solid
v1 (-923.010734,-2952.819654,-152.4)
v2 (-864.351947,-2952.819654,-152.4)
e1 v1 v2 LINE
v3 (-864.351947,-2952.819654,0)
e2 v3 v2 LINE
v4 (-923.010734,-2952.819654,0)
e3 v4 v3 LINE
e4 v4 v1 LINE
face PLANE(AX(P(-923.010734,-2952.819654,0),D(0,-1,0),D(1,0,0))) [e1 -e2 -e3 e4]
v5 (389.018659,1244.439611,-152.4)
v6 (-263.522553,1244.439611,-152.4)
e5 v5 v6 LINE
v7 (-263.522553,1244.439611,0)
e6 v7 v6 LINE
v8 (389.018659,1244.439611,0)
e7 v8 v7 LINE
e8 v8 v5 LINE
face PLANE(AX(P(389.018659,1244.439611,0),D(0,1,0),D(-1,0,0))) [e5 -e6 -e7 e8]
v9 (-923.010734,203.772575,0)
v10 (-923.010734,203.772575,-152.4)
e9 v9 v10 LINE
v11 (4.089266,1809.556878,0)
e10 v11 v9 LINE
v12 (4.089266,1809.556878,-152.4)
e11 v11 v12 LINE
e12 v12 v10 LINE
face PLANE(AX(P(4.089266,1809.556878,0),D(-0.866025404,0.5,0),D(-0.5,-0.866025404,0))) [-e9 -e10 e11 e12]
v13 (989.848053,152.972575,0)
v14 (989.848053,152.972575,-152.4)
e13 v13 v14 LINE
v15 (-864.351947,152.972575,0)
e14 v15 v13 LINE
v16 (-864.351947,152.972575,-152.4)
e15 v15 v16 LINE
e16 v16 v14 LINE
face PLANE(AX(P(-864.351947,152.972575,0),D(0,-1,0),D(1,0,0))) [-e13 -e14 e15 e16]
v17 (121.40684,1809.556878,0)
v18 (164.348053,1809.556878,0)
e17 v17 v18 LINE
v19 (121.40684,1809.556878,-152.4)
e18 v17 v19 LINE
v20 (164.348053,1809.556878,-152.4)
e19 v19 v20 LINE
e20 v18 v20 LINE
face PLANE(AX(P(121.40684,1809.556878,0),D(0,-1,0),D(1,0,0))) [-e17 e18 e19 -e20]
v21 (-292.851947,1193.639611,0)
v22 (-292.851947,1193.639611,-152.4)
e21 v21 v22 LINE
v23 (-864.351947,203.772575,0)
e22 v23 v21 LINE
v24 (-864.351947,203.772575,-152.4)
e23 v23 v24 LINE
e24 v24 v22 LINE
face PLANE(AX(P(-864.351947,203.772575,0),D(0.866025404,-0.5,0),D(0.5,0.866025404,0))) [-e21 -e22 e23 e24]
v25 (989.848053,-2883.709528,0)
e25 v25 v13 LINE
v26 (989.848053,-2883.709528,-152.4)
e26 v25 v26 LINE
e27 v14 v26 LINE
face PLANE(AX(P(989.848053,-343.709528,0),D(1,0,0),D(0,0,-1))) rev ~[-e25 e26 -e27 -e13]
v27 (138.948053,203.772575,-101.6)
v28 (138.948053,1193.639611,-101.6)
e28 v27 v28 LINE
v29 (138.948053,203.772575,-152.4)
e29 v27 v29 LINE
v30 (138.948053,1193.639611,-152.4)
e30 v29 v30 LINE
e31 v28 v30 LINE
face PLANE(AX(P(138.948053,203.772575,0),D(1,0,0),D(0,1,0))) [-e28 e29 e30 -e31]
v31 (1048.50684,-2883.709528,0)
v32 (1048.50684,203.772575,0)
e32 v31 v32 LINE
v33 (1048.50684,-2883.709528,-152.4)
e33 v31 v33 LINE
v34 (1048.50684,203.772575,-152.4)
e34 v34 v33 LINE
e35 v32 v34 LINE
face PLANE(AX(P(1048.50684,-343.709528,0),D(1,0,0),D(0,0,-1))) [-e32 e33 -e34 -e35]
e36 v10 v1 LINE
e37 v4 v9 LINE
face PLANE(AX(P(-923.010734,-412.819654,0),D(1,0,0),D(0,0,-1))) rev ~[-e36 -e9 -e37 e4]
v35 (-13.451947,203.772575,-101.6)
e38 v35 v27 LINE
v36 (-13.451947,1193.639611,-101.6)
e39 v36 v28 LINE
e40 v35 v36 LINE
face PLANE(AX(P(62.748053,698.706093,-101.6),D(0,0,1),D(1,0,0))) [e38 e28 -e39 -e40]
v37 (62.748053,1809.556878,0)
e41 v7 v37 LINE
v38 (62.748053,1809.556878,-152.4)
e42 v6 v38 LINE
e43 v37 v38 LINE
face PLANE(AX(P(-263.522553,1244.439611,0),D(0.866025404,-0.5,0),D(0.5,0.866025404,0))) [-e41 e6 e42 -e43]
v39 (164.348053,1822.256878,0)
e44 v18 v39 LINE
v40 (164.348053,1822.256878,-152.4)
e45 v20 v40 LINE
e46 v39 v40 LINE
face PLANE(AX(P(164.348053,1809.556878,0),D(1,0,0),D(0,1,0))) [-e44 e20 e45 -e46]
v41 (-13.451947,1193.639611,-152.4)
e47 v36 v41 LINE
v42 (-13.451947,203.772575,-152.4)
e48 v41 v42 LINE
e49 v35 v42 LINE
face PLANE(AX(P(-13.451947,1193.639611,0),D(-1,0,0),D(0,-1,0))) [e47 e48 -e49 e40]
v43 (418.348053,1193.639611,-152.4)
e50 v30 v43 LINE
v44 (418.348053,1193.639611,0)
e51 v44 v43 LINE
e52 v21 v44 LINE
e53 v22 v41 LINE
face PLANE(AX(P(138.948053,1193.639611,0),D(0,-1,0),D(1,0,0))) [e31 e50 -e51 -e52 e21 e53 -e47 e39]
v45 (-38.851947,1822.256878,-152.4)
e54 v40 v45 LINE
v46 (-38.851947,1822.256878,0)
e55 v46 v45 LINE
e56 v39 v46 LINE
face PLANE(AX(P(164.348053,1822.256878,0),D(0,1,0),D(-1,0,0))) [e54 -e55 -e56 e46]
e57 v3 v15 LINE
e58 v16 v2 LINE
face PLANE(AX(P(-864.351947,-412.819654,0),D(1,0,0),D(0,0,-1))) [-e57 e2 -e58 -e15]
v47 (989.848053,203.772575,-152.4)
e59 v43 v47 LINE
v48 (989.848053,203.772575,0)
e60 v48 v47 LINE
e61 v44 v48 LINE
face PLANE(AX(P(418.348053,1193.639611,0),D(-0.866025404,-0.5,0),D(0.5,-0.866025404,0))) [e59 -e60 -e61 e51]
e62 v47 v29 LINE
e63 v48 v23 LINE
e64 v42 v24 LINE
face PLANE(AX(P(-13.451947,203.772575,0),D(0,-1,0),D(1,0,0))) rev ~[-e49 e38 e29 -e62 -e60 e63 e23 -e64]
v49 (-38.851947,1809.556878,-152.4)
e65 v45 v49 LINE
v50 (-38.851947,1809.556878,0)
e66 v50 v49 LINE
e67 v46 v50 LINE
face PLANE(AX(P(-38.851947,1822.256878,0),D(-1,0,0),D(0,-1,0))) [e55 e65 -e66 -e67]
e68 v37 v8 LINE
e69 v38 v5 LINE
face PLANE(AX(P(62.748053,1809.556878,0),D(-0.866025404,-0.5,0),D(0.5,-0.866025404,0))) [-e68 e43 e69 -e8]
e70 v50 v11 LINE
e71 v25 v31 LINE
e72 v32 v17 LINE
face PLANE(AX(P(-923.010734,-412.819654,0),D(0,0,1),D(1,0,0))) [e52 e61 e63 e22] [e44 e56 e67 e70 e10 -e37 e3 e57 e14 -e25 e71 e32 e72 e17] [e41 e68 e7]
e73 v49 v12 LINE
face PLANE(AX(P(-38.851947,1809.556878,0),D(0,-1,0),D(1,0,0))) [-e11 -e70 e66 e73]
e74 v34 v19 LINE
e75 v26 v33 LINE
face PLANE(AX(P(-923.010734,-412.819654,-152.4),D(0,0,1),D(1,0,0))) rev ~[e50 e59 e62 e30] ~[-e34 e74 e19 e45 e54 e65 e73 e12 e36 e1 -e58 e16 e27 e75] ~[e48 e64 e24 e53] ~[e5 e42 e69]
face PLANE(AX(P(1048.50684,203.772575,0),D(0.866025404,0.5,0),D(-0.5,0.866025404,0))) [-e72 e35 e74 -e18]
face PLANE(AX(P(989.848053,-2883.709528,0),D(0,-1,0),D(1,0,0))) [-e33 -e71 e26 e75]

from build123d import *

# Parameters (mm, degrees)
F0_R     = 53.975
F1_DEPTH = 152.4
F2_W     = 152.4
F2_H     = 989.8670365256
F3_DEPTH = 101.6
F6_DEPTH = 2540
F7_DEPTH = 2540


# Not quite as in the source:
# - the program builds the solid bodies; features that only make, move or delete a surface that nothing else refers to are left out


with BuildPart() as f1:
    # F0 (on Top) → F1 (new body)
    with BuildSketch(Plane.XY):
        Polygon((-864.3519468606, 152.9725746632), (-864.3519468606, 203.7725746632), (-923.0107342102, 203.7725746632), (-923.0107342102, -412.8196537495), (-864.3519468606, -412.8196537495), align=None)
        Polygon((989.8480531394, 203.7725746632), (989.8480531394, 152.9725746632), (989.8480531394, -343.7095284462), (1048.5068404891, -343.7095284462), (1048.5068404891, 203.7725746632), align=None)
        Polygon((121.4068404891, 1809.5568783603), (62.7480531394, 1809.5568783603), (389.0186594646, 1244.4396111888), (418.3480531394, 1193.6396111888), (989.8480531394, 203.7725746632), (1048.5068404891, 203.7725746632), align=None)
        Polygon((-263.5225531857, 1244.4396111888), (-292.8519468606, 1193.6396111888), (-36.2017042935, 1193.6396111888), (-13.4519468606, 1193.6396111888), (116.1982957065, 1193.6396111888), (138.9480531394, 1193.6396111888), (418.3480531394, 1193.6396111888), (389.0186594646, 1244.4396111888), align=None)
        Polygon((-13.4519468606, 203.7725746632), (-864.3519468606, 203.7725746632), (-864.3519468606, 152.9725746632), (989.8480531394, 152.9725746632), (989.8480531394, 203.7725746632), (138.9480531394, 203.7725746632), (62.7480531394, 203.7725746632), align=None)
        Polygon((-13.4519468606, 1193.6396111888), (-13.4519468606, 203.7725746632), (62.7480531394, 203.7725746632), (138.9480531394, 203.7725746632), (138.9480531394, 1193.6396111888), (116.1982957065, 1193.6396111888), align=None)
        with Locations((62.7480531394, 698.6915746632)):
            Circle(F0_R, mode=Mode.SUBTRACT)
        Polygon((-923.0107342102, 203.7725746632), (-864.3519468606, 203.7725746632), (-292.8519468606, 1193.6396111888), (-263.5225531857, 1244.4396111888), (62.7480531394, 1809.5568783603), (4.0892657898, 1809.5568783603), align=None)
        with Locations((62.7480531394, 698.6915746632)):
            Circle(F0_R)
        Polygon((-38.8519468606, 1809.5568783603), (4.0892657898, 1809.5568783603), (62.7480531394, 1809.5568783603), (121.4068404891, 1809.5568783603), (164.3480531394, 1809.5568783603), (164.3480531394, 1822.2568783603), (-38.8519468606, 1822.2568783603), align=None)
    extrude(amount=-F1_DEPTH)

    # F2 (on face) → F3 (cut)
    with BuildSketch(Plane.XY):
        with Locations((62.7480531394, 698.706092926)):
            Rectangle(F2_W, F2_H)
    extrude(amount=-F3_DEPTH, mode=Mode.SUBTRACT)

    # F6 (add): a face of the model
    f6_faces = [f1.faces().sort_by_distance(p)[0] for p in [
        (1019.1774468143, -343.7095284462, -76.2),
    ]]
    extrude(f6_faces, amount=F6_DEPTH)

    # F7 (add): a face of the model
    f7_faces = [f1.faces().sort_by_distance(p)[0] for p in [
        (-893.6813405354, -412.8196537495, -76.2),
    ]]
    extrude(f7_faces, amount=F7_DEPTH)


solid = f1.part
